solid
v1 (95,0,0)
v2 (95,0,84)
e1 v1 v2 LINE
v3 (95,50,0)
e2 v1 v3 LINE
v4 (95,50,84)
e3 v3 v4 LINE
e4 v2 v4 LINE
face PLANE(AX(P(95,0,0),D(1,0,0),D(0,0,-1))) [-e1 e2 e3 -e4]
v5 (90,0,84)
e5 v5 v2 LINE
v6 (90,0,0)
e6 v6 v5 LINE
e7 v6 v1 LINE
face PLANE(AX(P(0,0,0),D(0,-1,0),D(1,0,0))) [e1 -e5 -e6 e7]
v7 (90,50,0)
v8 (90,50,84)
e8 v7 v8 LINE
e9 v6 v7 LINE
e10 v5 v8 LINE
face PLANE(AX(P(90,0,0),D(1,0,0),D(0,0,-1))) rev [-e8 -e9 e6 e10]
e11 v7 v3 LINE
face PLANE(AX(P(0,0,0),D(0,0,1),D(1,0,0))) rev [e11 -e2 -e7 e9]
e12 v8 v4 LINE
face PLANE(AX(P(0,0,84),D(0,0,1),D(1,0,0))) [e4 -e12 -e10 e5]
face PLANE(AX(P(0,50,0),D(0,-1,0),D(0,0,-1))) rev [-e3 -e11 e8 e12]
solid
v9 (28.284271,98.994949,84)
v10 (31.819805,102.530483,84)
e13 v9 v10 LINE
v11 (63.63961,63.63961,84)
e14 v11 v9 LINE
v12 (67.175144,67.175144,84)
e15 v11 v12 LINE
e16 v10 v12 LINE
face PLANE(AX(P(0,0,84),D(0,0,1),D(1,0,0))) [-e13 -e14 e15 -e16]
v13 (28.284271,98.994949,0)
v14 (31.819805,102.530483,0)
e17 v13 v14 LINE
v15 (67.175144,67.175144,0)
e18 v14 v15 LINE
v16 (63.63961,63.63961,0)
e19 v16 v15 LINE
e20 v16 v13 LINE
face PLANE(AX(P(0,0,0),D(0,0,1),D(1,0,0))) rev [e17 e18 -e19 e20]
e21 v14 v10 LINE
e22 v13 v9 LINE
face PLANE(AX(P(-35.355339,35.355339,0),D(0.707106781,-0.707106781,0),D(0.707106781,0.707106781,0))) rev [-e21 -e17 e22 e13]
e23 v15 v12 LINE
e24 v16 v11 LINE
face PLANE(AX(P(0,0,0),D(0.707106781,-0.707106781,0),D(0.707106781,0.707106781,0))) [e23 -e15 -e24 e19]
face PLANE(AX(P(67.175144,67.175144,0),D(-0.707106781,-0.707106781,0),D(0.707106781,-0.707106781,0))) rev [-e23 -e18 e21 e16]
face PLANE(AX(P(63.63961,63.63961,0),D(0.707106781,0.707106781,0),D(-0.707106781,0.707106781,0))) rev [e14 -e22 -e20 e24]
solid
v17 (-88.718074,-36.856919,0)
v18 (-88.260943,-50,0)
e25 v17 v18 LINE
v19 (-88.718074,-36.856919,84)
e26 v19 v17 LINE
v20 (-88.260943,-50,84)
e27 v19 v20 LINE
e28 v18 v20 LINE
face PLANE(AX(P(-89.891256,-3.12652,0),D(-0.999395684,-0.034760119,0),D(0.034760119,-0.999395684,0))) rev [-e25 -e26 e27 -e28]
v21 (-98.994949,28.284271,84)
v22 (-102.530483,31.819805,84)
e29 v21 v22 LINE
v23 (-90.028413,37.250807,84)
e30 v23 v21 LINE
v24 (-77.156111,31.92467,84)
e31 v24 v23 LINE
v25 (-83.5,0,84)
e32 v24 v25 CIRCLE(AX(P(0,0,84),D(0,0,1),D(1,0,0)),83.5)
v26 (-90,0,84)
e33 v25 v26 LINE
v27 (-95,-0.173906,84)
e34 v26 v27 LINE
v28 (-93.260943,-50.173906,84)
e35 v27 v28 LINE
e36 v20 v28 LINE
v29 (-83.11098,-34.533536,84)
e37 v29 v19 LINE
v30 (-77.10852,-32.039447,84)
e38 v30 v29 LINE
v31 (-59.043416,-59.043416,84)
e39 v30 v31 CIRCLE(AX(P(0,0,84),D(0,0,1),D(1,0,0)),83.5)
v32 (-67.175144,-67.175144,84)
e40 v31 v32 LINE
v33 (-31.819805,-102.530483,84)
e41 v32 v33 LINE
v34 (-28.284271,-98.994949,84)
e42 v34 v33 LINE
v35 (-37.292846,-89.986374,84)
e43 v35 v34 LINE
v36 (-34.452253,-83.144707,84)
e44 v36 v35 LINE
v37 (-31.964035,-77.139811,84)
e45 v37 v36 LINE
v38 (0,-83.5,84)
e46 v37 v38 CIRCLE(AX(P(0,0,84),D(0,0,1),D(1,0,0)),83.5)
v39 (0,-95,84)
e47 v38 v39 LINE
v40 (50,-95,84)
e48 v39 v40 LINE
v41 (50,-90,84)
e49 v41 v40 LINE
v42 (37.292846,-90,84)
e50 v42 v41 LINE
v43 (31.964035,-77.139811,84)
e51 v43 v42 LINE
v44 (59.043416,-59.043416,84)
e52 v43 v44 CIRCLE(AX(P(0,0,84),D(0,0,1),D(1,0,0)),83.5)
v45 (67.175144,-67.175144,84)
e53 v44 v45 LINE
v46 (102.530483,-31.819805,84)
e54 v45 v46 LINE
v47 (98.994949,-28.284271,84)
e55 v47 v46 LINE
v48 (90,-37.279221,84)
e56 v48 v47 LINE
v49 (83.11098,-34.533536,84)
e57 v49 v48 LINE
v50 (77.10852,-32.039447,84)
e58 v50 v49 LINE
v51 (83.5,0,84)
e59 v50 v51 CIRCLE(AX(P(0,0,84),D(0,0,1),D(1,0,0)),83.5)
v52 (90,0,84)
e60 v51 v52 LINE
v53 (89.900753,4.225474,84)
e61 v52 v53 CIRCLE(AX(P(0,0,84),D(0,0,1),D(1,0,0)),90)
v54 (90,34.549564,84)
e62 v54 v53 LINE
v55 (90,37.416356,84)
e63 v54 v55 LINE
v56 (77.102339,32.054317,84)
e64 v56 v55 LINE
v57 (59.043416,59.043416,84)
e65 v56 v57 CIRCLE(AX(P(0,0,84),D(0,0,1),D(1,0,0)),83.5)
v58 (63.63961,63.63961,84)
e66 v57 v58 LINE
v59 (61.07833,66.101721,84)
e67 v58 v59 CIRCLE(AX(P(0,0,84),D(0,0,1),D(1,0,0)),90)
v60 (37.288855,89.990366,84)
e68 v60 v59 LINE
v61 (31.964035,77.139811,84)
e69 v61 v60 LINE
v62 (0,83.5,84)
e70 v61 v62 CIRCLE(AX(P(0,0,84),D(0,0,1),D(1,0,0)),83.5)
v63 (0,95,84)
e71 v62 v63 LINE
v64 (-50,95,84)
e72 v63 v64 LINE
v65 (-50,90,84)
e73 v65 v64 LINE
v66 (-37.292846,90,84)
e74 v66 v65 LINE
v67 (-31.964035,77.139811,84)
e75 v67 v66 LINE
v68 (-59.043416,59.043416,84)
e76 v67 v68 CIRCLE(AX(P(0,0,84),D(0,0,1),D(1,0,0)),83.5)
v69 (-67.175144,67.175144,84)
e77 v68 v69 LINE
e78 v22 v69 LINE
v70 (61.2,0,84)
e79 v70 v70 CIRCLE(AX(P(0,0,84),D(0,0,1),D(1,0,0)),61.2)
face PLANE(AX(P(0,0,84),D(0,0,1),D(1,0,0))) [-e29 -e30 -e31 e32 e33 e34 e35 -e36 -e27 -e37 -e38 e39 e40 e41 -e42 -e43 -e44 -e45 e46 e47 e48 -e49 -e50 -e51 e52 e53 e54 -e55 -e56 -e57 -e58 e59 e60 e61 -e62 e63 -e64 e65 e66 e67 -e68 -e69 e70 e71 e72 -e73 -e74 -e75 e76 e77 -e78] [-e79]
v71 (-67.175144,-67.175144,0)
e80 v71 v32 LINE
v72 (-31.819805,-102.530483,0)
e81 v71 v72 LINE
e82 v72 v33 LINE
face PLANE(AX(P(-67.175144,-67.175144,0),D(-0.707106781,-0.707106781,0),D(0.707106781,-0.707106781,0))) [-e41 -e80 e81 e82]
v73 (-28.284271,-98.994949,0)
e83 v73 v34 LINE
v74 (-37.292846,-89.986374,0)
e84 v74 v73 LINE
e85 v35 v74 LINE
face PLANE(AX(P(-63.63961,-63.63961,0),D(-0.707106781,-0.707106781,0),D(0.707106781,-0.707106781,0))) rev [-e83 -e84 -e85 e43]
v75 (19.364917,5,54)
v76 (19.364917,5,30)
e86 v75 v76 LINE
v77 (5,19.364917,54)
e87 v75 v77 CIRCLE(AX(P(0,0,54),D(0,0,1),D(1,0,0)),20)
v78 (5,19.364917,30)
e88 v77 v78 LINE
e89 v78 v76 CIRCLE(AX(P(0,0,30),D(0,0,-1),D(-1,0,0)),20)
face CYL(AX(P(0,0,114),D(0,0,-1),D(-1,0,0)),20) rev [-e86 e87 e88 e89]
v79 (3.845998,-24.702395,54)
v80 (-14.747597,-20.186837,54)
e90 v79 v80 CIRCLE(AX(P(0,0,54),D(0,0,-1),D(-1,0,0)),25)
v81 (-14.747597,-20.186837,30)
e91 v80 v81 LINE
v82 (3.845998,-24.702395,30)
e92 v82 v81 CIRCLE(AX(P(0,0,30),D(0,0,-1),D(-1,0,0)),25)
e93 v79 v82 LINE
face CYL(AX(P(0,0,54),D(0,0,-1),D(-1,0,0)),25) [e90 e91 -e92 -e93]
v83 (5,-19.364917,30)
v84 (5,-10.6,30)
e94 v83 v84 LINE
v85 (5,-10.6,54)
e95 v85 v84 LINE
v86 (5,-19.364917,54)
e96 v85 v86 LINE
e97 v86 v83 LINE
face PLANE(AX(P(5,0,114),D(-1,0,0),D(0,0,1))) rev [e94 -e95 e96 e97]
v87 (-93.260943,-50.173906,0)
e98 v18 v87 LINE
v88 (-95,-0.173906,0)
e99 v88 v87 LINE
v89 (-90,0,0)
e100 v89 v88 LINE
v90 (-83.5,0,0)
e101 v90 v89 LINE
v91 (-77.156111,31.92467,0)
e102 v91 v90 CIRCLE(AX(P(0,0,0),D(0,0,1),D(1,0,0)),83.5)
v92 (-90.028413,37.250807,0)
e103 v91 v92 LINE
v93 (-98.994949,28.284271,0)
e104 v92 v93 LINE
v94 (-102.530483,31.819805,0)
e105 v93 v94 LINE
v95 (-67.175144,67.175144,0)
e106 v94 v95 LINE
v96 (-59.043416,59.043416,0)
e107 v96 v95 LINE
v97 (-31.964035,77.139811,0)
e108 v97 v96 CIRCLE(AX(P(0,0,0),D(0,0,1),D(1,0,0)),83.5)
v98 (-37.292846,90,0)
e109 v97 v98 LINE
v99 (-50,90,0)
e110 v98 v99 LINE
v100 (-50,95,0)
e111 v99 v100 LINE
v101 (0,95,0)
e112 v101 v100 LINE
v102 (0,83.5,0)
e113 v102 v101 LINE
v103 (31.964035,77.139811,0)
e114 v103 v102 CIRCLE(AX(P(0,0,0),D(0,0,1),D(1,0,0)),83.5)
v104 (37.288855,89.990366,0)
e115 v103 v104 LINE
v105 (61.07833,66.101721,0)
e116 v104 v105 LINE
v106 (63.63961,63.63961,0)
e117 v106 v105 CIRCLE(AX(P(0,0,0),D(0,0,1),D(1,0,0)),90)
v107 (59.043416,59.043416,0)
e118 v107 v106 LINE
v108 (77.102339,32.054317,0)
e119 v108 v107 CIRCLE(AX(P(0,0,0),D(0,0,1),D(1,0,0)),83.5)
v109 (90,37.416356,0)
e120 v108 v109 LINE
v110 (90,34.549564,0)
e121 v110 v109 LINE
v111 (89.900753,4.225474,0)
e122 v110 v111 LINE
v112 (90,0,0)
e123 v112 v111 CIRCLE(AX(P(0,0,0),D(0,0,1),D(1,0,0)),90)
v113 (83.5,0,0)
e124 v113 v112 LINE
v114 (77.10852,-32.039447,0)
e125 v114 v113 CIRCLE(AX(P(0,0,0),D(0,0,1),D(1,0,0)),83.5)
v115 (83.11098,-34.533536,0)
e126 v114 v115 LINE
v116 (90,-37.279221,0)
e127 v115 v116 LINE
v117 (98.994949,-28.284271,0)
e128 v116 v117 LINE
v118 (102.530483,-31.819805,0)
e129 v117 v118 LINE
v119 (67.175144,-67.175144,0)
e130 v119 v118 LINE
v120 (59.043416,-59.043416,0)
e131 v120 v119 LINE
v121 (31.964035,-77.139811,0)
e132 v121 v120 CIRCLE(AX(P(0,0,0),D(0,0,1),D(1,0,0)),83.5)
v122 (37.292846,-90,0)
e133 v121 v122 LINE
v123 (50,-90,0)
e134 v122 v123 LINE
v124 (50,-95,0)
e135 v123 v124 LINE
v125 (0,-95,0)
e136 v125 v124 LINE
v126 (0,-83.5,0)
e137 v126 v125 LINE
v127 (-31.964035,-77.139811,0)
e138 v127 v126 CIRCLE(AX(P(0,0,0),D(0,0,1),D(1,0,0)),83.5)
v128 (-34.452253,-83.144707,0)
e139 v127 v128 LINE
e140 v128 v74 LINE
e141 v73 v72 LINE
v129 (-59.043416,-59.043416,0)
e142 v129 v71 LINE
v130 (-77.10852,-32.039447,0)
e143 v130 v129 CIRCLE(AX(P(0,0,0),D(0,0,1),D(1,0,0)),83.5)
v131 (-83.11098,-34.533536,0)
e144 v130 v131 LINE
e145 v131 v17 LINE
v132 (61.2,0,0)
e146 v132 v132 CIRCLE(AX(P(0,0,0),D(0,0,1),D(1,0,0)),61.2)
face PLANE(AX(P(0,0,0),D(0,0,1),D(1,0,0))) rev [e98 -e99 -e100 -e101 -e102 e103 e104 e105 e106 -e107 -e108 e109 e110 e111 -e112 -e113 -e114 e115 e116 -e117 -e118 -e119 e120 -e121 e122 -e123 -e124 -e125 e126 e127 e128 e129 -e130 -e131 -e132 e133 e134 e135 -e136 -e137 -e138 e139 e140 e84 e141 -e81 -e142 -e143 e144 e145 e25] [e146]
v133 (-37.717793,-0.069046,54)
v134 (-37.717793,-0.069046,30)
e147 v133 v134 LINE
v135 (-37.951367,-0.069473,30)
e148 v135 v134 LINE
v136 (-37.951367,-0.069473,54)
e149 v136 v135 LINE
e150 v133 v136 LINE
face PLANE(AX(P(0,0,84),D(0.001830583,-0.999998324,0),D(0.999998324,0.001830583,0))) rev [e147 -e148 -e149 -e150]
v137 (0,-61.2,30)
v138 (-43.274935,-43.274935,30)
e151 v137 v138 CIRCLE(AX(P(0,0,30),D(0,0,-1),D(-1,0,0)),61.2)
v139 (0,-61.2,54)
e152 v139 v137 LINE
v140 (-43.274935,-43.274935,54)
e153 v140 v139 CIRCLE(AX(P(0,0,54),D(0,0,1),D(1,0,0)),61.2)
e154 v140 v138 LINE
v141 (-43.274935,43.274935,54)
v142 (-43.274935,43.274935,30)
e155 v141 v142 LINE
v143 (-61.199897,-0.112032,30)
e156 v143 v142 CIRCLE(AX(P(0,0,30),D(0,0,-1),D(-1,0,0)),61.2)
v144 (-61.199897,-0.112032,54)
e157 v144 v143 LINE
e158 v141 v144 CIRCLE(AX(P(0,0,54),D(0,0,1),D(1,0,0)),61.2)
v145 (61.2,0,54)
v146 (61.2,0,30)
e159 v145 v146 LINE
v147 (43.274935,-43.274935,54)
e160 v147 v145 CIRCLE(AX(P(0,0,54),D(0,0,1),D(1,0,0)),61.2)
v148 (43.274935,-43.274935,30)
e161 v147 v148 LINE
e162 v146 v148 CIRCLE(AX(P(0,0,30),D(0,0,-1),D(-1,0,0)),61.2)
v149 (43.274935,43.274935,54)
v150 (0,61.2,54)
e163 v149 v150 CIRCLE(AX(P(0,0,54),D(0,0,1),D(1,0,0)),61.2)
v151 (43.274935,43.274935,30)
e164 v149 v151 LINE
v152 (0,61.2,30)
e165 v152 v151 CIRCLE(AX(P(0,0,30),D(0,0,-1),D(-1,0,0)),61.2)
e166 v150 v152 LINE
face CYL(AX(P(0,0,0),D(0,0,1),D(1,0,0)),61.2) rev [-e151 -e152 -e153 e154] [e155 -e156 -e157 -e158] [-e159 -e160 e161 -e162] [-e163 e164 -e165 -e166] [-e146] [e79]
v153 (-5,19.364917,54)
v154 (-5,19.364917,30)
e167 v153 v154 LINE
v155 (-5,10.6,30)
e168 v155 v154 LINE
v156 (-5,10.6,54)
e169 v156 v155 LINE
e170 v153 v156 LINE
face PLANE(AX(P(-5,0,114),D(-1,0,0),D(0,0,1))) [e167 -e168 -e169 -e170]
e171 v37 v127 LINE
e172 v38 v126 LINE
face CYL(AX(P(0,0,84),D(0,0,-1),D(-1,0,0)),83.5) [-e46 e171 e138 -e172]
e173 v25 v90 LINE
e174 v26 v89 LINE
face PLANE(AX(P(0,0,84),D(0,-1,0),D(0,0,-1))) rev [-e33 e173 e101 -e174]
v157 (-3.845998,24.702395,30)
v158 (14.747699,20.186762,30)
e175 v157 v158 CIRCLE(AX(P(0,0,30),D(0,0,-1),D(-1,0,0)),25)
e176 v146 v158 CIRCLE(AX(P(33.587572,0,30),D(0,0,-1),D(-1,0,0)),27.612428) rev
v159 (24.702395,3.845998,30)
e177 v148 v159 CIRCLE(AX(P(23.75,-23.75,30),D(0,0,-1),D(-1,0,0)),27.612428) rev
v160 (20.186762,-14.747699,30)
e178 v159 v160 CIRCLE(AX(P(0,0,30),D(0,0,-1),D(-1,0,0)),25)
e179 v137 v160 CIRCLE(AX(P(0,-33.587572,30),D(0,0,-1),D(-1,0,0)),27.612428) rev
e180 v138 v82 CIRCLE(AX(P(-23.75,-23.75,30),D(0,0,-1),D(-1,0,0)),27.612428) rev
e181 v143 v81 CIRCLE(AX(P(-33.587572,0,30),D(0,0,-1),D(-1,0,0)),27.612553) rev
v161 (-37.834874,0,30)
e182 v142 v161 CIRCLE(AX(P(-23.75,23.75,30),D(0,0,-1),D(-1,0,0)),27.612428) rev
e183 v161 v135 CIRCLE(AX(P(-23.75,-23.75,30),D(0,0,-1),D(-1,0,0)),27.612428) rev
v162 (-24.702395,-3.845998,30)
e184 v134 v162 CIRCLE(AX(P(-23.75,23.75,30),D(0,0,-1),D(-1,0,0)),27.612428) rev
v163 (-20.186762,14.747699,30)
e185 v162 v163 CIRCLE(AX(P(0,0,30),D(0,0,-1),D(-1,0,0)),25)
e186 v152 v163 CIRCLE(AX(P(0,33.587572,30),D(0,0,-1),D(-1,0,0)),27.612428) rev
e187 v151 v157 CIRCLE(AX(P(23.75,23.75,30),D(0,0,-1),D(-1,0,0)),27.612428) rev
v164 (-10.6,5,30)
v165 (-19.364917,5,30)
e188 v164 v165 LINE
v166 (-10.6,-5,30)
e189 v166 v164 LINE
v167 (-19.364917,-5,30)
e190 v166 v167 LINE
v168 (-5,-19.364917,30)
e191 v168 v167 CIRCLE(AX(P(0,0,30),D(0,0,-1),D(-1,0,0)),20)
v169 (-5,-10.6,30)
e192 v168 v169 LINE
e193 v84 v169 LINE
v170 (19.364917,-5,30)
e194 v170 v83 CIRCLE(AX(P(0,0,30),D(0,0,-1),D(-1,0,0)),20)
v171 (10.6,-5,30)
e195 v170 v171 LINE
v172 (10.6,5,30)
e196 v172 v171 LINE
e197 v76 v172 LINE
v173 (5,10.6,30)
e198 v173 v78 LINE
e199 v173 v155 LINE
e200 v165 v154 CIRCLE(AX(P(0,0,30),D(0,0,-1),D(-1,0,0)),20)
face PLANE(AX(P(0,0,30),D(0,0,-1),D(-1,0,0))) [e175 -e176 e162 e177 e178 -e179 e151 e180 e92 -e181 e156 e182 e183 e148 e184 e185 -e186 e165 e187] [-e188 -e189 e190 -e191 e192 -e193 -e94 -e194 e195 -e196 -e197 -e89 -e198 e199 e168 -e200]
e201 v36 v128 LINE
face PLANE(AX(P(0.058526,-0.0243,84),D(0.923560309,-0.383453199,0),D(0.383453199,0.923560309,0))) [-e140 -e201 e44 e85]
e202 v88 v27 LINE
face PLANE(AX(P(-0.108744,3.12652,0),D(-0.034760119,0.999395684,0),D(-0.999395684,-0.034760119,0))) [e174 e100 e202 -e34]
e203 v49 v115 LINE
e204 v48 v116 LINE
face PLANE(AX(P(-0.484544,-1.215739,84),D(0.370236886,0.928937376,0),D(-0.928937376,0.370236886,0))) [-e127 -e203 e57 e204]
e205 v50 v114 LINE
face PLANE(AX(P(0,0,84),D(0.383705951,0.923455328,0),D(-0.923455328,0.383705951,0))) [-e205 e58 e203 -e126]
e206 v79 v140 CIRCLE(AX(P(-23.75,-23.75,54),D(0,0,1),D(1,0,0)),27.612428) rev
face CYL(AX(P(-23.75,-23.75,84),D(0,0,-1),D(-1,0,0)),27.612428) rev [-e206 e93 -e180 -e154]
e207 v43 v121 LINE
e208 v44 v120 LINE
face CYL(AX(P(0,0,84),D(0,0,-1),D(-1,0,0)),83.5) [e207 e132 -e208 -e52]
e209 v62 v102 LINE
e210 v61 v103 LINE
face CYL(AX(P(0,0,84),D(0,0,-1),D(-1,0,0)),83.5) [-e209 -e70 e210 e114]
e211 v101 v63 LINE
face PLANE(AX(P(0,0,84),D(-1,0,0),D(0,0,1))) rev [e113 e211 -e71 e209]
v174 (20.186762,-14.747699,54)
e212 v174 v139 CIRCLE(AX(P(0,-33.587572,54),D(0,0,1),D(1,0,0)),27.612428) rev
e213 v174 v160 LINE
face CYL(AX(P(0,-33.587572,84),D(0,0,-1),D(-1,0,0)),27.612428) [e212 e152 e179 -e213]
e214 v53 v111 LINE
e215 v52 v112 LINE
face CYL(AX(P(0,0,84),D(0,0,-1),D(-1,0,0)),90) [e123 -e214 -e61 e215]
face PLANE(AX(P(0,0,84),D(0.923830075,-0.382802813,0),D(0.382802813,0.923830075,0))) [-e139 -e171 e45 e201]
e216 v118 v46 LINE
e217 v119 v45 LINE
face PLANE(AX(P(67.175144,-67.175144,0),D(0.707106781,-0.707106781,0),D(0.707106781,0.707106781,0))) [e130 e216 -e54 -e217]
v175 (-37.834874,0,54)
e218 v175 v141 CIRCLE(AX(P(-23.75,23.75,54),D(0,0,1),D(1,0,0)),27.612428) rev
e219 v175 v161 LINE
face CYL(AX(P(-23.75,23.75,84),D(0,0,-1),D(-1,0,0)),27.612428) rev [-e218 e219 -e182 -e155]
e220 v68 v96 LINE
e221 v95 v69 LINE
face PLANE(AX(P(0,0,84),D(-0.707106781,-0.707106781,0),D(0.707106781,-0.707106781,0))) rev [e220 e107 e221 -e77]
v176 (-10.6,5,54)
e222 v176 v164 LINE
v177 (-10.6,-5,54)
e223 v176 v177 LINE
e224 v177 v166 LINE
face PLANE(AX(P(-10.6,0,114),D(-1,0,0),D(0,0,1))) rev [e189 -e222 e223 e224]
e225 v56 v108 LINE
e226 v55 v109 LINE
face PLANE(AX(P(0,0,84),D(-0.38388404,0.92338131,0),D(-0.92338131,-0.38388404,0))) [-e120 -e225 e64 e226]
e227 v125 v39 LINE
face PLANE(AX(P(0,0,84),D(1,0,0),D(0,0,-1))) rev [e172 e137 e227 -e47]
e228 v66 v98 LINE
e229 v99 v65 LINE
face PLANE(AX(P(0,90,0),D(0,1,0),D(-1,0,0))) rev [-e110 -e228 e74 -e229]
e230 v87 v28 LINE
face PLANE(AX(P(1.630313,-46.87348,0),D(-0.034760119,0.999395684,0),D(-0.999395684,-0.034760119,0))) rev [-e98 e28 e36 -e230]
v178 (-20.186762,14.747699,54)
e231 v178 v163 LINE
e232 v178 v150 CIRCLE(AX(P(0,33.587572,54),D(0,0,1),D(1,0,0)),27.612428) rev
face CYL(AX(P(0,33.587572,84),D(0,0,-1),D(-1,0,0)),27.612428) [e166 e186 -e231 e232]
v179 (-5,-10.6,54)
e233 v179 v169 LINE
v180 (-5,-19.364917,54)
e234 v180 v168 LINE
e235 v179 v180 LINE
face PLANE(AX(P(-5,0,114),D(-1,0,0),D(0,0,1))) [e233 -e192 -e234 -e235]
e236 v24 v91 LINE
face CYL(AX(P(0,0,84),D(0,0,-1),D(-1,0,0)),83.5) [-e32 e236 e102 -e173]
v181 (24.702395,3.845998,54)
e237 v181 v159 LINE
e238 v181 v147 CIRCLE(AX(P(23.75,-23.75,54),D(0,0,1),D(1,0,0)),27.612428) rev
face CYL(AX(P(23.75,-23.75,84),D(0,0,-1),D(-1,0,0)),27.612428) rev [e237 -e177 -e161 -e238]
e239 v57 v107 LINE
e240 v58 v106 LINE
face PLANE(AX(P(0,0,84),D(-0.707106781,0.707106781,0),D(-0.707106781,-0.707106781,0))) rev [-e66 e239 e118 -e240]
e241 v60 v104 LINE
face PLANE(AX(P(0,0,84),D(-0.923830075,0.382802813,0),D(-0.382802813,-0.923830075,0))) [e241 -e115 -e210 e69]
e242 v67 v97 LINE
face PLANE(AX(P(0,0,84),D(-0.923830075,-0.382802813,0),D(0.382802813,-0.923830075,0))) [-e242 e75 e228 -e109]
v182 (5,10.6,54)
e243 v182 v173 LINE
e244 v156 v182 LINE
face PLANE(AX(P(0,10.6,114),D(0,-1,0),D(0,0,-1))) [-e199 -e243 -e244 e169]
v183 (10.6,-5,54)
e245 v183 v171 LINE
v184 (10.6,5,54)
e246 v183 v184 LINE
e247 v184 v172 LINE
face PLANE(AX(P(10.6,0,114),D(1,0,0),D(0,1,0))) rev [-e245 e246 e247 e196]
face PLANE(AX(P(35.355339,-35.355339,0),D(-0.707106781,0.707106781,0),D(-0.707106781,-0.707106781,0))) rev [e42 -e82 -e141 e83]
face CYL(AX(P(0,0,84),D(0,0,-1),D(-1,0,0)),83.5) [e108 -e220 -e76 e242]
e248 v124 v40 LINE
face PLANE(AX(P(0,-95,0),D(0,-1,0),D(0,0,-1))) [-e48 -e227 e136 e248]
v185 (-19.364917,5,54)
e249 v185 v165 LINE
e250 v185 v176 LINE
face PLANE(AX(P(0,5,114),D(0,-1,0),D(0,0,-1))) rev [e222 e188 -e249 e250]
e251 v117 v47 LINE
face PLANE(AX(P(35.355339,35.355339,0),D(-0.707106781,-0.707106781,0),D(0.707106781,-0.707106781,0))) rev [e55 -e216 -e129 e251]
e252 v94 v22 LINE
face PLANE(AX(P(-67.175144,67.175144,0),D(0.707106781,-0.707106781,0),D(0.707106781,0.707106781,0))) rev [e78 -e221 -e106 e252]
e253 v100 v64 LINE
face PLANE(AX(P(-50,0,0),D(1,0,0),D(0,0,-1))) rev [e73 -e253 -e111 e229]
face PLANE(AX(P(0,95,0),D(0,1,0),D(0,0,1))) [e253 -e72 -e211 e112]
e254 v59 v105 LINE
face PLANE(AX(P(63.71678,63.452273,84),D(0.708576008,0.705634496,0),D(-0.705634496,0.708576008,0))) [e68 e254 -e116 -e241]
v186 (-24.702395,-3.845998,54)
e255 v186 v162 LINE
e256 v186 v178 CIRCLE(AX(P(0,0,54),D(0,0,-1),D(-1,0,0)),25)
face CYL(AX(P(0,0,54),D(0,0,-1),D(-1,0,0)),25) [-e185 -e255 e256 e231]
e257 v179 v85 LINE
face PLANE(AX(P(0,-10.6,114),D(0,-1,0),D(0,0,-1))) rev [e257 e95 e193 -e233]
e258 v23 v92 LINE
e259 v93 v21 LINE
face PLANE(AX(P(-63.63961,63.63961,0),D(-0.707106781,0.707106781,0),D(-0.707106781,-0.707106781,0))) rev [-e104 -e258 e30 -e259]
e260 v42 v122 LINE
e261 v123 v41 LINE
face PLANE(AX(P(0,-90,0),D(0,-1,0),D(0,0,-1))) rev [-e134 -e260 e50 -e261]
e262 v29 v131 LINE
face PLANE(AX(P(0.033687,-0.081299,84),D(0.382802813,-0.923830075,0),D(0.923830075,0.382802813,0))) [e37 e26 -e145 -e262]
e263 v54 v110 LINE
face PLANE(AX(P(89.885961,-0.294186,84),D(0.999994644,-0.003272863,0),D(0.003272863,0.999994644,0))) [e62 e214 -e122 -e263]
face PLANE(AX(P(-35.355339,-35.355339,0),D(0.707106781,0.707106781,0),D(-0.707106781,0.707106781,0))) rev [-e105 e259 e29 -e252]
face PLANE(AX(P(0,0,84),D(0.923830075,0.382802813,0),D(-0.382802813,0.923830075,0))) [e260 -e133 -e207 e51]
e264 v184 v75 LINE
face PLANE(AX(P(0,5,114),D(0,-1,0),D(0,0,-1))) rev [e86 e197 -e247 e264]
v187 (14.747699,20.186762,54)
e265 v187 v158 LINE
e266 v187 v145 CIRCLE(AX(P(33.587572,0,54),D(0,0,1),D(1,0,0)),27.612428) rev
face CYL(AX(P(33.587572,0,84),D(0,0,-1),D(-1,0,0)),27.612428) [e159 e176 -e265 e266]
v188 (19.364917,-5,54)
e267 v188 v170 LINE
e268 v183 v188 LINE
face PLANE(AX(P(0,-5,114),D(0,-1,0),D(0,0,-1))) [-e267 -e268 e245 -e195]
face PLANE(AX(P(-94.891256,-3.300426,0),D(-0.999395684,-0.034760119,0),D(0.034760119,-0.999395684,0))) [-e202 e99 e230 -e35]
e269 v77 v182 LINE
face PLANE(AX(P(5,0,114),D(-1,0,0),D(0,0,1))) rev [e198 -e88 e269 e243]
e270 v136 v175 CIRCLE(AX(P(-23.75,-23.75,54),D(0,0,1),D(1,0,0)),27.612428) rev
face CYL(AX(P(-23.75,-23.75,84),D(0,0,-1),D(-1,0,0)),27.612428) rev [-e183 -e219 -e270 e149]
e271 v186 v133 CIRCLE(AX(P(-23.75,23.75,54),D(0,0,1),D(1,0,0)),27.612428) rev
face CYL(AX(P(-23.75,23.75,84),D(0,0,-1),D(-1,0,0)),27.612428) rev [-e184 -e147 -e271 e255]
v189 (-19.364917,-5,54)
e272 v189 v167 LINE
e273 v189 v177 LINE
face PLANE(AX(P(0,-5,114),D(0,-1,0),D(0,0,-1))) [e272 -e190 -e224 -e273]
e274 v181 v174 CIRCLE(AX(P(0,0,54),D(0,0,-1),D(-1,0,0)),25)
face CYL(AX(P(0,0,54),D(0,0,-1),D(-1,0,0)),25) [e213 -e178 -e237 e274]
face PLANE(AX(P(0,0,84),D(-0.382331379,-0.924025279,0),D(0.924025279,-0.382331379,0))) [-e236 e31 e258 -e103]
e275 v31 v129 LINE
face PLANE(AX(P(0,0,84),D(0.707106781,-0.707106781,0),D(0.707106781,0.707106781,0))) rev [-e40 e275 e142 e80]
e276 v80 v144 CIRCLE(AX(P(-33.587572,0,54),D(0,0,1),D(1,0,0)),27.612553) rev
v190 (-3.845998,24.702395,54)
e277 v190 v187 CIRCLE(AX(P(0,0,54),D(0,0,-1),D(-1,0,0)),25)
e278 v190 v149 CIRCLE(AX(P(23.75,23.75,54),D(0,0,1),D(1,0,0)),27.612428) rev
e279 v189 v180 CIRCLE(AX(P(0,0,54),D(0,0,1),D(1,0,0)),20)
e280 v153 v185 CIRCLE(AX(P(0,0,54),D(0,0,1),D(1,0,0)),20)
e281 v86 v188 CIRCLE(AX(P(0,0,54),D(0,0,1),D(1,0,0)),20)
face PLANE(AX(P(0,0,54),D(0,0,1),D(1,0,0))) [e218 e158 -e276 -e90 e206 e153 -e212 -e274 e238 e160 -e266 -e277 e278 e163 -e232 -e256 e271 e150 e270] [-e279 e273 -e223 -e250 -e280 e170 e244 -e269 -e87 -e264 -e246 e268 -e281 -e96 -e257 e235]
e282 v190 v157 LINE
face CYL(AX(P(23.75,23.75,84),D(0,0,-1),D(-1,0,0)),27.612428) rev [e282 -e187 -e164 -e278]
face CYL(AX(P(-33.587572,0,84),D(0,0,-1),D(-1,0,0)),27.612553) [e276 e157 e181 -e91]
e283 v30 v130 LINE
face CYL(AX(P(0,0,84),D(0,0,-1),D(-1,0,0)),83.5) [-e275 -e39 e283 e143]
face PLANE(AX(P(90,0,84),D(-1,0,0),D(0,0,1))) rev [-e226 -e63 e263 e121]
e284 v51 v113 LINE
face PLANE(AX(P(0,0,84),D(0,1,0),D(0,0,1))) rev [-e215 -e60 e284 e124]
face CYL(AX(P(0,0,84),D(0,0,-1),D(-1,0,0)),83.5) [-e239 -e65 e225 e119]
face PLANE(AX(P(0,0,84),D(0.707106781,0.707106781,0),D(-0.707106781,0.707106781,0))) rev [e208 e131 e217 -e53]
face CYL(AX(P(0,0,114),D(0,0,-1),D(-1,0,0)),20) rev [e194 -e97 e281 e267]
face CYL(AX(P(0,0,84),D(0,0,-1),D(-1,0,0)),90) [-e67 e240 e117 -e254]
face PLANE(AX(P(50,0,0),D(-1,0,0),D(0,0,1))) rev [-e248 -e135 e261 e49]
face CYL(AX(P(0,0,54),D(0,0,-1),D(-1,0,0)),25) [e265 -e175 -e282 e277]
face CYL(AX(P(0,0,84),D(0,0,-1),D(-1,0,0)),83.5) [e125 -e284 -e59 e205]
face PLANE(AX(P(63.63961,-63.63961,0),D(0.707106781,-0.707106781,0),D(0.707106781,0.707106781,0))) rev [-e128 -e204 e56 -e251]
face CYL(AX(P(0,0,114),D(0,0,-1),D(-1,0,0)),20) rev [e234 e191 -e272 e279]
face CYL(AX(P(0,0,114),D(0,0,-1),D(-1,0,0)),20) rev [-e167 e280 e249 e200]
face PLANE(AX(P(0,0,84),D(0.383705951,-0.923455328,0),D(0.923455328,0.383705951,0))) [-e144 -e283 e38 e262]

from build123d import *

# Parameters (mm, degrees)
BOSS_EXTRUDE1_DEPTH  = 84
CLEATS_START         = -84
SKETCH13_W           = 5
SKETCH13_H           = 50
SKETCH13_W_2         = 50
SKETCH13_H_2         = 5
CLEATS_DEPTH         = 84
CLEATS_2_DEPTH       = 84
SKETCH15_R           = 61.2
SKETCH15_R_2         = 20
MIDDLE_CUT_DEPTH     = 84
BOSS_EXTRUDE13_DEPTH = 84
SKETCH18_R           = 61.2
WHEEL_CUT1_DEPTH     = 30
SKETCH19_R           = 61.2
WHEEL_CUT2_DEPTH     = 30
SKETCH20_R           = 25
BOSS_EXTRUDE14_DEPTH = 24
CUT_EXTRUDE4_DEPTH   = 84


with BuildPart() as part:
    # Sketch1 → Boss-Extrude1 (new body)
    with BuildSketch(Plane.XY):
        with BuildLine():
            Line((0, 83.5), (0, 90))
            ThreePointArc((0, 90), (-17.563832105, 88.269540623), (-34.452253143, 83.144706707))
            Line((-34.452253143, 83.144706707), (-31.964034861, 77.139811222))
            ThreePointArc((-31.964034861, 77.139811222), (-46.394600078, 69.424715222), (-59.043416229, 59.043416229))
            Line((-59.043416229, 59.043416229), (-63.639610307, 63.639610307))
            ThreePointArc((-63.639610307, 63.639610307), (-74.841789746, 49.987063402), (-83.162275131, 34.409824105))
            Line((-83.162275131, 34.409824105), (-77.156110816, 31.924670142))
            ThreePointArc((-77.156110816, 31.924670142), (-81.898672923, 16.274439266), (-83.5, 0))
            Line((-83.5, 0), (-90, 0))
            ThreePointArc((-90, 0), (-88.260943117, -17.606984978), (-83.110979555, -34.533535547))
            Line((-83.110979555, -34.533535547), (-77.108519921, -32.039446869))
            ThreePointArc((-77.108519921, -32.039446869), (-69.402024608, -46.428536272), (-59.043416229, -59.043416229))
            Line((-59.043416229, -59.043416229), (-63.639610307, -63.639610307))
            ThreePointArc((-63.639610307, -63.639610307), (-50.006155773, -74.829034371), (-34.452253143, -83.144706707))
            Line((-34.452253143, -83.144706707), (-31.964034861, -77.139811222))
            ThreePointArc((-31.964034861, -77.139811222), (-16.295333119, -81.894518245), (0, -83.5))
            Line((0, -83.5), (0, -90))
            ThreePointArc((0, -90), (17.563832105, -88.269540623), (34.452253143, -83.144706707))
            Line((34.452253143, -83.144706707), (31.964034861, -77.139811222))
            ThreePointArc((31.964034861, -77.139811222), (46.394600078, -69.424715222), (59.043416229, -59.043416229))
            Line((59.043416229, -59.043416229), (63.639610307, -63.639610307))
            ThreePointArc((63.639610307, -63.639610307), (74.804577421, -50.042733706), (83.110979555, -34.533535547))
            Line((83.110979555, -34.533535547), (77.108519921, -32.039446869))
            ThreePointArc((77.108519921, -32.039446869), (81.88654167, -16.335369396), (83.5, 0))
            Line((83.5, 0), (90, 0))
            ThreePointArc((90, 0), (88.259244876, 17.615495846), (83.104317913, 34.549563588))
            Line((83.104317913, 34.549563588), (77.102339397, 32.054317329))
            ThreePointArc((77.102339397, 32.054317329), (69.397547209, 46.435228452), (59.043416229, 59.043416229))
            Line((59.043416229, 59.043416229), (63.639610307, 63.639610307))
            ThreePointArc((63.639610307, 63.639610307), (50.006155773, 74.829034371), (34.452253143, 83.144706707))
            Line((34.452253143, 83.144706707), (31.964034861, 77.139811222))
            ThreePointArc((31.964034861, 77.139811222), (16.295333119, 81.894518245), (0, 83.5))
        make_face()
    extrude(amount=BOSS_EXTRUDE1_DEPTH)

    # Sketch13 → Cleats (add)
    with BuildSketch(Plane.XY.offset(84).offset(CLEATS_START)):
        with Locations((92.5, 25)):
            Rectangle(SKETCH13_W, SKETCH13_H)
        Polygon((28.284271247, 98.994949366), (63.639610307, 63.639610307), (67.175144213, 67.175144213), (31.819805153, 102.530483272), align=None)
        with Locations((-25, 92.5)):
            Rectangle(SKETCH13_W_2, SKETCH13_H_2)
        Polygon((-98.994949366, 28.284271247), (-63.639610307, 63.639610307), (-67.175144213, 67.175144213), (-102.530483272, 31.819805153), align=None)
        with BuildLine():
            ThreePointArc((-89.782512145, -6.253040302), (-89.945611602, -3.128410698), (-90, 0))
            Line((-90, 0), (-95, -0.173905688))
            Line((-95, -0.173905688), (-93.260943117, -50.173905688))
            Line((-93.260943117, -50.173905688), (-88.260943117, -50))
            Line((-88.260943117, -50), (-89.782512145, -6.253040302))
        make_face()
        Polygon((-28.284271247, -98.994949366), (-63.639610307, -63.639610307), (-67.175144213, -67.175144213), (-31.819805153, -102.530483272), align=None)
        with Locations((25, -92.5)):
            Rectangle(SKETCH13_W_2, SKETCH13_H_2)
        Polygon((98.994949366, -28.284271247), (63.639610307, -63.639610307), (67.175144213, -67.175144213), (102.530483272, -31.819805153), align=None)
    extrude(amount=CLEATS_DEPTH)


with BuildPart() as cleats_piece_1:
    # of the separate pieces the step leaves, piece 1, a body of its own (cleats_pieces)
    add(part.part.solids().sort_by_distance((31.964034861, -77.139811222, 0))[0])



with BuildPart() as cleats_piece_2:
    # of the separate pieces the step leaves, piece 2, a body of its own (cleats_pieces)
    add(part.part.solids().sort_by_distance((-28.284271247, -98.994949366, 0))[0])


with BuildPart() as cleats_piece_3:
    # of the separate pieces the step leaves, piece 3, a body of its own (cleats_pieces)
    add(part.part.solids().sort_by_distance((98.994949366, -28.284271247, 0))[0])


with BuildPart() as cleats_piece_4:
    # of the separate pieces the step leaves, piece 4, a body of its own (cleats_pieces)
    add(part.part.solids().sort_by_distance((-50, 90, 0))[0])


with BuildPart() as cleats_piece_5:
    # of the separate pieces the step leaves, piece 5, a body of its own (cleats_pieces)
    add(part.part.solids().sort_by_distance((90, 50, 0))[0])


with BuildPart() as cleats_piece_6:
    # of the separate pieces the step leaves, piece 6, a body of its own (cleats_pieces)
    add(part.part.solids().sort_by_distance((-98.994949366, 28.284271247, 0))[0])


with BuildPart() as cleats_piece_7:
    # of the separate pieces the step leaves, piece 7, a body of its own (cleats_pieces)
    add(part.part.solids().sort_by_distance((28.284271247, 98.994949366, 0))[0])


with BuildPart() as cleats_piece_8:
    # of the separate pieces the step leaves, piece 8, a body of its own (cleats_pieces)
    add(part.part.solids().sort_by_distance((50, -90, 0))[0])


with BuildPart() as cleats_piece_1_1:
    add(cleats_piece_1.part)

    add(cleats_piece_4.part)  # cleats_2 merges Cleats piece 4

    add(cleats_piece_6.part)  # cleats_2 merges Cleats piece 6

    add(cleats_piece_2.part)  # cleats_2 merges Cleats piece 2

    add(cleats_piece_8.part)  # cleats_2 merges Cleats piece 8

    add(cleats_piece_3.part)  # cleats_2 merges Cleats piece 3
    # Sketch14 → cleats_2 (add)
    with BuildSketch(Plane(origin=(0, 0, 0), x_dir=(-1, 0, 0), z_dir=(0, 0, -1))):
        with BuildLine():
            Line((-34.452253143, 83.144706707), (-37.288854525, 89.990366088))
            Line((-37.288854525, 89.990366088), (-61.078330233, 66.10172143))
            ThreePointArc((-61.078330233, 66.10172143), (-48.519469565, 75.801458252), (-34.452253143, 83.144706707))
        make_face()
        with BuildLine():
            Line((34.452253143, 83.144706707), (37.292846481, 90))
            Line((37.292846481, 90), (0, 90))
            ThreePointArc((0, 90), (17.563832105, 88.269540623), (34.452253143, 83.144706707))
        make_face()
        with BuildLine():
            Line((90.028413475, 37.250807139), (63.639610307, 63.639610307))
            ThreePointArc((63.639610307, 63.639610307), (74.841789746, 49.987063402), (83.162275131, 34.409824105))
            Line((83.162275131, 34.409824105), (90.028413475, 37.250807139))
        make_face()
        with BuildLine():
            ThreePointArc((89.782512145, -6.253040302), (87.595584768, -20.664305678), (83.110979555, -34.533535547))
            Line((83.110979555, -34.533535547), (88.71807442, -36.856919192))
            Line((88.71807442, -36.856919192), (89.782512145, -6.253040302))
        make_face()
        with BuildLine():
            Line((37.292846481, -89.986374133), (63.639610307, -63.639610307))
            ThreePointArc((63.639610307, -63.639610307), (50.006155773, -74.829034371), (34.452253143, -83.144706707))
            Line((34.452253143, -83.144706707), (37.292846481, -89.986374133))
        make_face()
        with BuildLine():
            Line((-37.292846481, -90), (0, -90))
            ThreePointArc((0, -90), (-17.563832105, -88.269540623), (-34.452253143, -83.144706707))
            Line((-34.452253143, -83.144706707), (-37.292846481, -90))
        make_face()
        with BuildLine():
            Line((-90, -37.279220614), (-63.639610307, -63.639610307))
            ThreePointArc((-63.639610307, -63.639610307), (-74.804577421, -50.042733706), (-83.110979555, -34.533535547))
            Line((-83.110979555, -34.533535547), (-90, -37.279220614))
        make_face()
        with BuildLine():
            Line((-90, 34.549563588), (-89.900752874, 4.225474262))
            ThreePointArc((-89.900752874, 4.225474262), (-87.821274347, 19.6830834), (-83.104317913, 34.549563588))
            Line((-83.104317913, 34.549563588), (-90, 37.416355744))
            Line((-90, 37.416355744), (-90, 34.549563588))
        make_face()
    extrude(amount=-CLEATS_2_DEPTH)

    # Sketch15 → Middle_cut (cut)
    with BuildSketch(Plane.XY.offset(84)):
        Circle(SKETCH15_R)
        Circle(SKETCH15_R_2, mode=Mode.SUBTRACT)
    extrude(amount=-MIDDLE_CUT_DEPTH, mode=Mode.SUBTRACT)


with BuildPart() as middle_cut_piece_1:
    # of the separate pieces the step leaves, piece 1, a body of its own (middle_cut_pieces)
    add(cleats_piece_1_1.part.solids().sort_by_distance((98.994949366, -28.284271247, 0))[0])



with BuildPart() as middle_cut_piece_2:
    # of the separate pieces the step leaves, piece 2, a body of its own (middle_cut_pieces)
    add(cleats_piece_1_1.part.solids().sort_by_distance((20, 0, 0))[0])


with BuildPart() as middle_cut_piece_1_1:
    add(middle_cut_piece_1.part)

    add(middle_cut_piece_2.part)  # Boss-Extrude13 merges Middle_cut piece 2
    # Sketch17 → Boss-Extrude13 (add)
    with BuildSketch(Plane(origin=(0, 0, 0), x_dir=(-1, 0, 0), z_dir=(0, 0, -1))):
        with BuildLine():
            ThreePointArc((3.560893817, 19.680448044), (10.821218323, 16.819668071), (16.434110434, 11.398246104))
            ThreePointArc((16.434110434, 11.398246104), (26.221625986, 42.240462075), (1.9e-08, 61.2))
            ThreePointArc((1.9e-08, 61.2), (-23.420226037, 56.5414274), (-43.274934986, 43.274935032))
            ThreePointArc((-43.274934986, 43.274935032), (-11.327027619, 48.410006719), (3.560893817, 19.680448044))
        make_face()
        with BuildLine():
            ThreePointArc((11.398143562, -16.434181553), (42.187287015, -26.239244767), (61.199897458, -0.112031687))
            ThreePointArc((61.199897458, -0.112031687), (56.562840024, 23.368464401), (43.274934911, 43.274935106))
            ThreePointArc((43.274934911, 43.274935106), (51.146803007, 20.305967602), (37.83487395, 0))
            ThreePointArc((37.83487395, 0), (37.893163173, -0.034665095), (37.951367081, -0.069473249))
            Line((37.951367081, -0.069473249), (37.717792865, -0.069045671))
            ThreePointArc((37.717792865, -0.069045671), (28.998051461, -3.359115257), (19.680448044, -3.560893817))
            ThreePointArc((19.680448044, -3.560893817), (16.819634311, -10.821270796), (11.398143562, -16.434181553))
        make_face()
        with BuildLine():
            ThreePointArc((-3.560893817, -19.680448044), (-10.821218323, -16.819668071), (-16.434110434, -11.398246104))
            ThreePointArc((-16.434110434, -11.398246104), (-26.22162598, -42.240462094), (2e-08, -61.2))
            ThreePointArc((2e-08, -61.2), (23.4202261, -56.541427373), (43.274935055, -43.274934963))
            ThreePointArc((43.274935055, -43.274934963), (11.327027663, -48.410006741), (-3.560893817, -19.680448044))
        make_face()
        with BuildLine():
            ThreePointArc((-19.680448044, 3.560893817), (-16.819668071, 10.821218323), (-11.398246104, 16.434110434))
            ThreePointArc((-11.398246104, 16.434110434), (-42.240462085, 26.221625983), (-61.2, -2e-09))
            ThreePointArc((-61.2, -2e-09), (-56.541427408, -23.420226016), (-43.274935079, -43.274934938))
            ThreePointArc((-43.274935079, -43.274934938), (-48.410006704, -11.327027589), (-19.680448044, 3.560893817))
        make_face()
    extrude(amount=-BOSS_EXTRUDE13_DEPTH)

    # Sketch18 → Wheel_cut1 (cut)
    with BuildSketch(Plane.XY.offset(84)):
        Circle(SKETCH18_R)
    extrude(amount=-WHEEL_CUT1_DEPTH, mode=Mode.SUBTRACT)

    # Sketch19 → wheel_cut2 (cut)
    with BuildSketch(Plane(origin=(0, 0, 0), x_dir=(-1, 0, 0), z_dir=(0, 0, -1))):
        Circle(SKETCH19_R)
    extrude(amount=-WHEEL_CUT2_DEPTH, mode=Mode.SUBTRACT)

    # Sketch20 → Boss-Extrude14 (add)
    with BuildSketch(Plane(origin=(0, 0, 30), x_dir=(-1, 0, 0), z_dir=(0, 0, -1))):
        Circle(SKETCH20_R)
    extrude(amount=-BOSS_EXTRUDE14_DEPTH)

    # Sketch21 → Cut-Extrude4 (cut)
    with BuildSketch(Plane(origin=(0, 0, 30), x_dir=(-1, 0, 0), z_dir=(0, 0, -1))):
        with BuildLine():
            Line((-10.6, 5), (-10.6, -5))
            Line((-10.6, -5), (-19.364916731, -5))
            ThreePointArc((-19.364916731, -5), (-14.142135624, -14.142135624), (-5, -19.364916731))
            Line((-5, -19.364916731), (-5, -10.6))
            Line((-5, -10.6), (5, -10.6))
            Line((5, -10.6), (5, -19.364916731))
            ThreePointArc((5, -19.364916731), (14.142135624, -14.142135624), (19.364916731, -5))
            Line((19.364916731, -5), (10.6, -5))
            Line((10.6, -5), (10.6, 5))
            Line((10.6, 5), (19.364916731, 5))
            ThreePointArc((19.364916731, 5), (14.142135624, 14.142135624), (5, 19.364916731))
            Line((5, 19.364916731), (5, 10.6))
            Line((5, 10.6), (-5, 10.6))
            Line((-5, 10.6), (-5, 19.364916731))
            ThreePointArc((-5, 19.364916731), (-14.142135624, 14.142135624), (-19.364916731, 5))
            Line((-19.364916731, 5), (-10.6, 5))
        make_face()
    extrude(amount=-CUT_EXTRUDE4_DEPTH, mode=Mode.SUBTRACT)


solid = Compound([cleats_piece_5.part, cleats_piece_7.part, middle_cut_piece_1_1.part])
